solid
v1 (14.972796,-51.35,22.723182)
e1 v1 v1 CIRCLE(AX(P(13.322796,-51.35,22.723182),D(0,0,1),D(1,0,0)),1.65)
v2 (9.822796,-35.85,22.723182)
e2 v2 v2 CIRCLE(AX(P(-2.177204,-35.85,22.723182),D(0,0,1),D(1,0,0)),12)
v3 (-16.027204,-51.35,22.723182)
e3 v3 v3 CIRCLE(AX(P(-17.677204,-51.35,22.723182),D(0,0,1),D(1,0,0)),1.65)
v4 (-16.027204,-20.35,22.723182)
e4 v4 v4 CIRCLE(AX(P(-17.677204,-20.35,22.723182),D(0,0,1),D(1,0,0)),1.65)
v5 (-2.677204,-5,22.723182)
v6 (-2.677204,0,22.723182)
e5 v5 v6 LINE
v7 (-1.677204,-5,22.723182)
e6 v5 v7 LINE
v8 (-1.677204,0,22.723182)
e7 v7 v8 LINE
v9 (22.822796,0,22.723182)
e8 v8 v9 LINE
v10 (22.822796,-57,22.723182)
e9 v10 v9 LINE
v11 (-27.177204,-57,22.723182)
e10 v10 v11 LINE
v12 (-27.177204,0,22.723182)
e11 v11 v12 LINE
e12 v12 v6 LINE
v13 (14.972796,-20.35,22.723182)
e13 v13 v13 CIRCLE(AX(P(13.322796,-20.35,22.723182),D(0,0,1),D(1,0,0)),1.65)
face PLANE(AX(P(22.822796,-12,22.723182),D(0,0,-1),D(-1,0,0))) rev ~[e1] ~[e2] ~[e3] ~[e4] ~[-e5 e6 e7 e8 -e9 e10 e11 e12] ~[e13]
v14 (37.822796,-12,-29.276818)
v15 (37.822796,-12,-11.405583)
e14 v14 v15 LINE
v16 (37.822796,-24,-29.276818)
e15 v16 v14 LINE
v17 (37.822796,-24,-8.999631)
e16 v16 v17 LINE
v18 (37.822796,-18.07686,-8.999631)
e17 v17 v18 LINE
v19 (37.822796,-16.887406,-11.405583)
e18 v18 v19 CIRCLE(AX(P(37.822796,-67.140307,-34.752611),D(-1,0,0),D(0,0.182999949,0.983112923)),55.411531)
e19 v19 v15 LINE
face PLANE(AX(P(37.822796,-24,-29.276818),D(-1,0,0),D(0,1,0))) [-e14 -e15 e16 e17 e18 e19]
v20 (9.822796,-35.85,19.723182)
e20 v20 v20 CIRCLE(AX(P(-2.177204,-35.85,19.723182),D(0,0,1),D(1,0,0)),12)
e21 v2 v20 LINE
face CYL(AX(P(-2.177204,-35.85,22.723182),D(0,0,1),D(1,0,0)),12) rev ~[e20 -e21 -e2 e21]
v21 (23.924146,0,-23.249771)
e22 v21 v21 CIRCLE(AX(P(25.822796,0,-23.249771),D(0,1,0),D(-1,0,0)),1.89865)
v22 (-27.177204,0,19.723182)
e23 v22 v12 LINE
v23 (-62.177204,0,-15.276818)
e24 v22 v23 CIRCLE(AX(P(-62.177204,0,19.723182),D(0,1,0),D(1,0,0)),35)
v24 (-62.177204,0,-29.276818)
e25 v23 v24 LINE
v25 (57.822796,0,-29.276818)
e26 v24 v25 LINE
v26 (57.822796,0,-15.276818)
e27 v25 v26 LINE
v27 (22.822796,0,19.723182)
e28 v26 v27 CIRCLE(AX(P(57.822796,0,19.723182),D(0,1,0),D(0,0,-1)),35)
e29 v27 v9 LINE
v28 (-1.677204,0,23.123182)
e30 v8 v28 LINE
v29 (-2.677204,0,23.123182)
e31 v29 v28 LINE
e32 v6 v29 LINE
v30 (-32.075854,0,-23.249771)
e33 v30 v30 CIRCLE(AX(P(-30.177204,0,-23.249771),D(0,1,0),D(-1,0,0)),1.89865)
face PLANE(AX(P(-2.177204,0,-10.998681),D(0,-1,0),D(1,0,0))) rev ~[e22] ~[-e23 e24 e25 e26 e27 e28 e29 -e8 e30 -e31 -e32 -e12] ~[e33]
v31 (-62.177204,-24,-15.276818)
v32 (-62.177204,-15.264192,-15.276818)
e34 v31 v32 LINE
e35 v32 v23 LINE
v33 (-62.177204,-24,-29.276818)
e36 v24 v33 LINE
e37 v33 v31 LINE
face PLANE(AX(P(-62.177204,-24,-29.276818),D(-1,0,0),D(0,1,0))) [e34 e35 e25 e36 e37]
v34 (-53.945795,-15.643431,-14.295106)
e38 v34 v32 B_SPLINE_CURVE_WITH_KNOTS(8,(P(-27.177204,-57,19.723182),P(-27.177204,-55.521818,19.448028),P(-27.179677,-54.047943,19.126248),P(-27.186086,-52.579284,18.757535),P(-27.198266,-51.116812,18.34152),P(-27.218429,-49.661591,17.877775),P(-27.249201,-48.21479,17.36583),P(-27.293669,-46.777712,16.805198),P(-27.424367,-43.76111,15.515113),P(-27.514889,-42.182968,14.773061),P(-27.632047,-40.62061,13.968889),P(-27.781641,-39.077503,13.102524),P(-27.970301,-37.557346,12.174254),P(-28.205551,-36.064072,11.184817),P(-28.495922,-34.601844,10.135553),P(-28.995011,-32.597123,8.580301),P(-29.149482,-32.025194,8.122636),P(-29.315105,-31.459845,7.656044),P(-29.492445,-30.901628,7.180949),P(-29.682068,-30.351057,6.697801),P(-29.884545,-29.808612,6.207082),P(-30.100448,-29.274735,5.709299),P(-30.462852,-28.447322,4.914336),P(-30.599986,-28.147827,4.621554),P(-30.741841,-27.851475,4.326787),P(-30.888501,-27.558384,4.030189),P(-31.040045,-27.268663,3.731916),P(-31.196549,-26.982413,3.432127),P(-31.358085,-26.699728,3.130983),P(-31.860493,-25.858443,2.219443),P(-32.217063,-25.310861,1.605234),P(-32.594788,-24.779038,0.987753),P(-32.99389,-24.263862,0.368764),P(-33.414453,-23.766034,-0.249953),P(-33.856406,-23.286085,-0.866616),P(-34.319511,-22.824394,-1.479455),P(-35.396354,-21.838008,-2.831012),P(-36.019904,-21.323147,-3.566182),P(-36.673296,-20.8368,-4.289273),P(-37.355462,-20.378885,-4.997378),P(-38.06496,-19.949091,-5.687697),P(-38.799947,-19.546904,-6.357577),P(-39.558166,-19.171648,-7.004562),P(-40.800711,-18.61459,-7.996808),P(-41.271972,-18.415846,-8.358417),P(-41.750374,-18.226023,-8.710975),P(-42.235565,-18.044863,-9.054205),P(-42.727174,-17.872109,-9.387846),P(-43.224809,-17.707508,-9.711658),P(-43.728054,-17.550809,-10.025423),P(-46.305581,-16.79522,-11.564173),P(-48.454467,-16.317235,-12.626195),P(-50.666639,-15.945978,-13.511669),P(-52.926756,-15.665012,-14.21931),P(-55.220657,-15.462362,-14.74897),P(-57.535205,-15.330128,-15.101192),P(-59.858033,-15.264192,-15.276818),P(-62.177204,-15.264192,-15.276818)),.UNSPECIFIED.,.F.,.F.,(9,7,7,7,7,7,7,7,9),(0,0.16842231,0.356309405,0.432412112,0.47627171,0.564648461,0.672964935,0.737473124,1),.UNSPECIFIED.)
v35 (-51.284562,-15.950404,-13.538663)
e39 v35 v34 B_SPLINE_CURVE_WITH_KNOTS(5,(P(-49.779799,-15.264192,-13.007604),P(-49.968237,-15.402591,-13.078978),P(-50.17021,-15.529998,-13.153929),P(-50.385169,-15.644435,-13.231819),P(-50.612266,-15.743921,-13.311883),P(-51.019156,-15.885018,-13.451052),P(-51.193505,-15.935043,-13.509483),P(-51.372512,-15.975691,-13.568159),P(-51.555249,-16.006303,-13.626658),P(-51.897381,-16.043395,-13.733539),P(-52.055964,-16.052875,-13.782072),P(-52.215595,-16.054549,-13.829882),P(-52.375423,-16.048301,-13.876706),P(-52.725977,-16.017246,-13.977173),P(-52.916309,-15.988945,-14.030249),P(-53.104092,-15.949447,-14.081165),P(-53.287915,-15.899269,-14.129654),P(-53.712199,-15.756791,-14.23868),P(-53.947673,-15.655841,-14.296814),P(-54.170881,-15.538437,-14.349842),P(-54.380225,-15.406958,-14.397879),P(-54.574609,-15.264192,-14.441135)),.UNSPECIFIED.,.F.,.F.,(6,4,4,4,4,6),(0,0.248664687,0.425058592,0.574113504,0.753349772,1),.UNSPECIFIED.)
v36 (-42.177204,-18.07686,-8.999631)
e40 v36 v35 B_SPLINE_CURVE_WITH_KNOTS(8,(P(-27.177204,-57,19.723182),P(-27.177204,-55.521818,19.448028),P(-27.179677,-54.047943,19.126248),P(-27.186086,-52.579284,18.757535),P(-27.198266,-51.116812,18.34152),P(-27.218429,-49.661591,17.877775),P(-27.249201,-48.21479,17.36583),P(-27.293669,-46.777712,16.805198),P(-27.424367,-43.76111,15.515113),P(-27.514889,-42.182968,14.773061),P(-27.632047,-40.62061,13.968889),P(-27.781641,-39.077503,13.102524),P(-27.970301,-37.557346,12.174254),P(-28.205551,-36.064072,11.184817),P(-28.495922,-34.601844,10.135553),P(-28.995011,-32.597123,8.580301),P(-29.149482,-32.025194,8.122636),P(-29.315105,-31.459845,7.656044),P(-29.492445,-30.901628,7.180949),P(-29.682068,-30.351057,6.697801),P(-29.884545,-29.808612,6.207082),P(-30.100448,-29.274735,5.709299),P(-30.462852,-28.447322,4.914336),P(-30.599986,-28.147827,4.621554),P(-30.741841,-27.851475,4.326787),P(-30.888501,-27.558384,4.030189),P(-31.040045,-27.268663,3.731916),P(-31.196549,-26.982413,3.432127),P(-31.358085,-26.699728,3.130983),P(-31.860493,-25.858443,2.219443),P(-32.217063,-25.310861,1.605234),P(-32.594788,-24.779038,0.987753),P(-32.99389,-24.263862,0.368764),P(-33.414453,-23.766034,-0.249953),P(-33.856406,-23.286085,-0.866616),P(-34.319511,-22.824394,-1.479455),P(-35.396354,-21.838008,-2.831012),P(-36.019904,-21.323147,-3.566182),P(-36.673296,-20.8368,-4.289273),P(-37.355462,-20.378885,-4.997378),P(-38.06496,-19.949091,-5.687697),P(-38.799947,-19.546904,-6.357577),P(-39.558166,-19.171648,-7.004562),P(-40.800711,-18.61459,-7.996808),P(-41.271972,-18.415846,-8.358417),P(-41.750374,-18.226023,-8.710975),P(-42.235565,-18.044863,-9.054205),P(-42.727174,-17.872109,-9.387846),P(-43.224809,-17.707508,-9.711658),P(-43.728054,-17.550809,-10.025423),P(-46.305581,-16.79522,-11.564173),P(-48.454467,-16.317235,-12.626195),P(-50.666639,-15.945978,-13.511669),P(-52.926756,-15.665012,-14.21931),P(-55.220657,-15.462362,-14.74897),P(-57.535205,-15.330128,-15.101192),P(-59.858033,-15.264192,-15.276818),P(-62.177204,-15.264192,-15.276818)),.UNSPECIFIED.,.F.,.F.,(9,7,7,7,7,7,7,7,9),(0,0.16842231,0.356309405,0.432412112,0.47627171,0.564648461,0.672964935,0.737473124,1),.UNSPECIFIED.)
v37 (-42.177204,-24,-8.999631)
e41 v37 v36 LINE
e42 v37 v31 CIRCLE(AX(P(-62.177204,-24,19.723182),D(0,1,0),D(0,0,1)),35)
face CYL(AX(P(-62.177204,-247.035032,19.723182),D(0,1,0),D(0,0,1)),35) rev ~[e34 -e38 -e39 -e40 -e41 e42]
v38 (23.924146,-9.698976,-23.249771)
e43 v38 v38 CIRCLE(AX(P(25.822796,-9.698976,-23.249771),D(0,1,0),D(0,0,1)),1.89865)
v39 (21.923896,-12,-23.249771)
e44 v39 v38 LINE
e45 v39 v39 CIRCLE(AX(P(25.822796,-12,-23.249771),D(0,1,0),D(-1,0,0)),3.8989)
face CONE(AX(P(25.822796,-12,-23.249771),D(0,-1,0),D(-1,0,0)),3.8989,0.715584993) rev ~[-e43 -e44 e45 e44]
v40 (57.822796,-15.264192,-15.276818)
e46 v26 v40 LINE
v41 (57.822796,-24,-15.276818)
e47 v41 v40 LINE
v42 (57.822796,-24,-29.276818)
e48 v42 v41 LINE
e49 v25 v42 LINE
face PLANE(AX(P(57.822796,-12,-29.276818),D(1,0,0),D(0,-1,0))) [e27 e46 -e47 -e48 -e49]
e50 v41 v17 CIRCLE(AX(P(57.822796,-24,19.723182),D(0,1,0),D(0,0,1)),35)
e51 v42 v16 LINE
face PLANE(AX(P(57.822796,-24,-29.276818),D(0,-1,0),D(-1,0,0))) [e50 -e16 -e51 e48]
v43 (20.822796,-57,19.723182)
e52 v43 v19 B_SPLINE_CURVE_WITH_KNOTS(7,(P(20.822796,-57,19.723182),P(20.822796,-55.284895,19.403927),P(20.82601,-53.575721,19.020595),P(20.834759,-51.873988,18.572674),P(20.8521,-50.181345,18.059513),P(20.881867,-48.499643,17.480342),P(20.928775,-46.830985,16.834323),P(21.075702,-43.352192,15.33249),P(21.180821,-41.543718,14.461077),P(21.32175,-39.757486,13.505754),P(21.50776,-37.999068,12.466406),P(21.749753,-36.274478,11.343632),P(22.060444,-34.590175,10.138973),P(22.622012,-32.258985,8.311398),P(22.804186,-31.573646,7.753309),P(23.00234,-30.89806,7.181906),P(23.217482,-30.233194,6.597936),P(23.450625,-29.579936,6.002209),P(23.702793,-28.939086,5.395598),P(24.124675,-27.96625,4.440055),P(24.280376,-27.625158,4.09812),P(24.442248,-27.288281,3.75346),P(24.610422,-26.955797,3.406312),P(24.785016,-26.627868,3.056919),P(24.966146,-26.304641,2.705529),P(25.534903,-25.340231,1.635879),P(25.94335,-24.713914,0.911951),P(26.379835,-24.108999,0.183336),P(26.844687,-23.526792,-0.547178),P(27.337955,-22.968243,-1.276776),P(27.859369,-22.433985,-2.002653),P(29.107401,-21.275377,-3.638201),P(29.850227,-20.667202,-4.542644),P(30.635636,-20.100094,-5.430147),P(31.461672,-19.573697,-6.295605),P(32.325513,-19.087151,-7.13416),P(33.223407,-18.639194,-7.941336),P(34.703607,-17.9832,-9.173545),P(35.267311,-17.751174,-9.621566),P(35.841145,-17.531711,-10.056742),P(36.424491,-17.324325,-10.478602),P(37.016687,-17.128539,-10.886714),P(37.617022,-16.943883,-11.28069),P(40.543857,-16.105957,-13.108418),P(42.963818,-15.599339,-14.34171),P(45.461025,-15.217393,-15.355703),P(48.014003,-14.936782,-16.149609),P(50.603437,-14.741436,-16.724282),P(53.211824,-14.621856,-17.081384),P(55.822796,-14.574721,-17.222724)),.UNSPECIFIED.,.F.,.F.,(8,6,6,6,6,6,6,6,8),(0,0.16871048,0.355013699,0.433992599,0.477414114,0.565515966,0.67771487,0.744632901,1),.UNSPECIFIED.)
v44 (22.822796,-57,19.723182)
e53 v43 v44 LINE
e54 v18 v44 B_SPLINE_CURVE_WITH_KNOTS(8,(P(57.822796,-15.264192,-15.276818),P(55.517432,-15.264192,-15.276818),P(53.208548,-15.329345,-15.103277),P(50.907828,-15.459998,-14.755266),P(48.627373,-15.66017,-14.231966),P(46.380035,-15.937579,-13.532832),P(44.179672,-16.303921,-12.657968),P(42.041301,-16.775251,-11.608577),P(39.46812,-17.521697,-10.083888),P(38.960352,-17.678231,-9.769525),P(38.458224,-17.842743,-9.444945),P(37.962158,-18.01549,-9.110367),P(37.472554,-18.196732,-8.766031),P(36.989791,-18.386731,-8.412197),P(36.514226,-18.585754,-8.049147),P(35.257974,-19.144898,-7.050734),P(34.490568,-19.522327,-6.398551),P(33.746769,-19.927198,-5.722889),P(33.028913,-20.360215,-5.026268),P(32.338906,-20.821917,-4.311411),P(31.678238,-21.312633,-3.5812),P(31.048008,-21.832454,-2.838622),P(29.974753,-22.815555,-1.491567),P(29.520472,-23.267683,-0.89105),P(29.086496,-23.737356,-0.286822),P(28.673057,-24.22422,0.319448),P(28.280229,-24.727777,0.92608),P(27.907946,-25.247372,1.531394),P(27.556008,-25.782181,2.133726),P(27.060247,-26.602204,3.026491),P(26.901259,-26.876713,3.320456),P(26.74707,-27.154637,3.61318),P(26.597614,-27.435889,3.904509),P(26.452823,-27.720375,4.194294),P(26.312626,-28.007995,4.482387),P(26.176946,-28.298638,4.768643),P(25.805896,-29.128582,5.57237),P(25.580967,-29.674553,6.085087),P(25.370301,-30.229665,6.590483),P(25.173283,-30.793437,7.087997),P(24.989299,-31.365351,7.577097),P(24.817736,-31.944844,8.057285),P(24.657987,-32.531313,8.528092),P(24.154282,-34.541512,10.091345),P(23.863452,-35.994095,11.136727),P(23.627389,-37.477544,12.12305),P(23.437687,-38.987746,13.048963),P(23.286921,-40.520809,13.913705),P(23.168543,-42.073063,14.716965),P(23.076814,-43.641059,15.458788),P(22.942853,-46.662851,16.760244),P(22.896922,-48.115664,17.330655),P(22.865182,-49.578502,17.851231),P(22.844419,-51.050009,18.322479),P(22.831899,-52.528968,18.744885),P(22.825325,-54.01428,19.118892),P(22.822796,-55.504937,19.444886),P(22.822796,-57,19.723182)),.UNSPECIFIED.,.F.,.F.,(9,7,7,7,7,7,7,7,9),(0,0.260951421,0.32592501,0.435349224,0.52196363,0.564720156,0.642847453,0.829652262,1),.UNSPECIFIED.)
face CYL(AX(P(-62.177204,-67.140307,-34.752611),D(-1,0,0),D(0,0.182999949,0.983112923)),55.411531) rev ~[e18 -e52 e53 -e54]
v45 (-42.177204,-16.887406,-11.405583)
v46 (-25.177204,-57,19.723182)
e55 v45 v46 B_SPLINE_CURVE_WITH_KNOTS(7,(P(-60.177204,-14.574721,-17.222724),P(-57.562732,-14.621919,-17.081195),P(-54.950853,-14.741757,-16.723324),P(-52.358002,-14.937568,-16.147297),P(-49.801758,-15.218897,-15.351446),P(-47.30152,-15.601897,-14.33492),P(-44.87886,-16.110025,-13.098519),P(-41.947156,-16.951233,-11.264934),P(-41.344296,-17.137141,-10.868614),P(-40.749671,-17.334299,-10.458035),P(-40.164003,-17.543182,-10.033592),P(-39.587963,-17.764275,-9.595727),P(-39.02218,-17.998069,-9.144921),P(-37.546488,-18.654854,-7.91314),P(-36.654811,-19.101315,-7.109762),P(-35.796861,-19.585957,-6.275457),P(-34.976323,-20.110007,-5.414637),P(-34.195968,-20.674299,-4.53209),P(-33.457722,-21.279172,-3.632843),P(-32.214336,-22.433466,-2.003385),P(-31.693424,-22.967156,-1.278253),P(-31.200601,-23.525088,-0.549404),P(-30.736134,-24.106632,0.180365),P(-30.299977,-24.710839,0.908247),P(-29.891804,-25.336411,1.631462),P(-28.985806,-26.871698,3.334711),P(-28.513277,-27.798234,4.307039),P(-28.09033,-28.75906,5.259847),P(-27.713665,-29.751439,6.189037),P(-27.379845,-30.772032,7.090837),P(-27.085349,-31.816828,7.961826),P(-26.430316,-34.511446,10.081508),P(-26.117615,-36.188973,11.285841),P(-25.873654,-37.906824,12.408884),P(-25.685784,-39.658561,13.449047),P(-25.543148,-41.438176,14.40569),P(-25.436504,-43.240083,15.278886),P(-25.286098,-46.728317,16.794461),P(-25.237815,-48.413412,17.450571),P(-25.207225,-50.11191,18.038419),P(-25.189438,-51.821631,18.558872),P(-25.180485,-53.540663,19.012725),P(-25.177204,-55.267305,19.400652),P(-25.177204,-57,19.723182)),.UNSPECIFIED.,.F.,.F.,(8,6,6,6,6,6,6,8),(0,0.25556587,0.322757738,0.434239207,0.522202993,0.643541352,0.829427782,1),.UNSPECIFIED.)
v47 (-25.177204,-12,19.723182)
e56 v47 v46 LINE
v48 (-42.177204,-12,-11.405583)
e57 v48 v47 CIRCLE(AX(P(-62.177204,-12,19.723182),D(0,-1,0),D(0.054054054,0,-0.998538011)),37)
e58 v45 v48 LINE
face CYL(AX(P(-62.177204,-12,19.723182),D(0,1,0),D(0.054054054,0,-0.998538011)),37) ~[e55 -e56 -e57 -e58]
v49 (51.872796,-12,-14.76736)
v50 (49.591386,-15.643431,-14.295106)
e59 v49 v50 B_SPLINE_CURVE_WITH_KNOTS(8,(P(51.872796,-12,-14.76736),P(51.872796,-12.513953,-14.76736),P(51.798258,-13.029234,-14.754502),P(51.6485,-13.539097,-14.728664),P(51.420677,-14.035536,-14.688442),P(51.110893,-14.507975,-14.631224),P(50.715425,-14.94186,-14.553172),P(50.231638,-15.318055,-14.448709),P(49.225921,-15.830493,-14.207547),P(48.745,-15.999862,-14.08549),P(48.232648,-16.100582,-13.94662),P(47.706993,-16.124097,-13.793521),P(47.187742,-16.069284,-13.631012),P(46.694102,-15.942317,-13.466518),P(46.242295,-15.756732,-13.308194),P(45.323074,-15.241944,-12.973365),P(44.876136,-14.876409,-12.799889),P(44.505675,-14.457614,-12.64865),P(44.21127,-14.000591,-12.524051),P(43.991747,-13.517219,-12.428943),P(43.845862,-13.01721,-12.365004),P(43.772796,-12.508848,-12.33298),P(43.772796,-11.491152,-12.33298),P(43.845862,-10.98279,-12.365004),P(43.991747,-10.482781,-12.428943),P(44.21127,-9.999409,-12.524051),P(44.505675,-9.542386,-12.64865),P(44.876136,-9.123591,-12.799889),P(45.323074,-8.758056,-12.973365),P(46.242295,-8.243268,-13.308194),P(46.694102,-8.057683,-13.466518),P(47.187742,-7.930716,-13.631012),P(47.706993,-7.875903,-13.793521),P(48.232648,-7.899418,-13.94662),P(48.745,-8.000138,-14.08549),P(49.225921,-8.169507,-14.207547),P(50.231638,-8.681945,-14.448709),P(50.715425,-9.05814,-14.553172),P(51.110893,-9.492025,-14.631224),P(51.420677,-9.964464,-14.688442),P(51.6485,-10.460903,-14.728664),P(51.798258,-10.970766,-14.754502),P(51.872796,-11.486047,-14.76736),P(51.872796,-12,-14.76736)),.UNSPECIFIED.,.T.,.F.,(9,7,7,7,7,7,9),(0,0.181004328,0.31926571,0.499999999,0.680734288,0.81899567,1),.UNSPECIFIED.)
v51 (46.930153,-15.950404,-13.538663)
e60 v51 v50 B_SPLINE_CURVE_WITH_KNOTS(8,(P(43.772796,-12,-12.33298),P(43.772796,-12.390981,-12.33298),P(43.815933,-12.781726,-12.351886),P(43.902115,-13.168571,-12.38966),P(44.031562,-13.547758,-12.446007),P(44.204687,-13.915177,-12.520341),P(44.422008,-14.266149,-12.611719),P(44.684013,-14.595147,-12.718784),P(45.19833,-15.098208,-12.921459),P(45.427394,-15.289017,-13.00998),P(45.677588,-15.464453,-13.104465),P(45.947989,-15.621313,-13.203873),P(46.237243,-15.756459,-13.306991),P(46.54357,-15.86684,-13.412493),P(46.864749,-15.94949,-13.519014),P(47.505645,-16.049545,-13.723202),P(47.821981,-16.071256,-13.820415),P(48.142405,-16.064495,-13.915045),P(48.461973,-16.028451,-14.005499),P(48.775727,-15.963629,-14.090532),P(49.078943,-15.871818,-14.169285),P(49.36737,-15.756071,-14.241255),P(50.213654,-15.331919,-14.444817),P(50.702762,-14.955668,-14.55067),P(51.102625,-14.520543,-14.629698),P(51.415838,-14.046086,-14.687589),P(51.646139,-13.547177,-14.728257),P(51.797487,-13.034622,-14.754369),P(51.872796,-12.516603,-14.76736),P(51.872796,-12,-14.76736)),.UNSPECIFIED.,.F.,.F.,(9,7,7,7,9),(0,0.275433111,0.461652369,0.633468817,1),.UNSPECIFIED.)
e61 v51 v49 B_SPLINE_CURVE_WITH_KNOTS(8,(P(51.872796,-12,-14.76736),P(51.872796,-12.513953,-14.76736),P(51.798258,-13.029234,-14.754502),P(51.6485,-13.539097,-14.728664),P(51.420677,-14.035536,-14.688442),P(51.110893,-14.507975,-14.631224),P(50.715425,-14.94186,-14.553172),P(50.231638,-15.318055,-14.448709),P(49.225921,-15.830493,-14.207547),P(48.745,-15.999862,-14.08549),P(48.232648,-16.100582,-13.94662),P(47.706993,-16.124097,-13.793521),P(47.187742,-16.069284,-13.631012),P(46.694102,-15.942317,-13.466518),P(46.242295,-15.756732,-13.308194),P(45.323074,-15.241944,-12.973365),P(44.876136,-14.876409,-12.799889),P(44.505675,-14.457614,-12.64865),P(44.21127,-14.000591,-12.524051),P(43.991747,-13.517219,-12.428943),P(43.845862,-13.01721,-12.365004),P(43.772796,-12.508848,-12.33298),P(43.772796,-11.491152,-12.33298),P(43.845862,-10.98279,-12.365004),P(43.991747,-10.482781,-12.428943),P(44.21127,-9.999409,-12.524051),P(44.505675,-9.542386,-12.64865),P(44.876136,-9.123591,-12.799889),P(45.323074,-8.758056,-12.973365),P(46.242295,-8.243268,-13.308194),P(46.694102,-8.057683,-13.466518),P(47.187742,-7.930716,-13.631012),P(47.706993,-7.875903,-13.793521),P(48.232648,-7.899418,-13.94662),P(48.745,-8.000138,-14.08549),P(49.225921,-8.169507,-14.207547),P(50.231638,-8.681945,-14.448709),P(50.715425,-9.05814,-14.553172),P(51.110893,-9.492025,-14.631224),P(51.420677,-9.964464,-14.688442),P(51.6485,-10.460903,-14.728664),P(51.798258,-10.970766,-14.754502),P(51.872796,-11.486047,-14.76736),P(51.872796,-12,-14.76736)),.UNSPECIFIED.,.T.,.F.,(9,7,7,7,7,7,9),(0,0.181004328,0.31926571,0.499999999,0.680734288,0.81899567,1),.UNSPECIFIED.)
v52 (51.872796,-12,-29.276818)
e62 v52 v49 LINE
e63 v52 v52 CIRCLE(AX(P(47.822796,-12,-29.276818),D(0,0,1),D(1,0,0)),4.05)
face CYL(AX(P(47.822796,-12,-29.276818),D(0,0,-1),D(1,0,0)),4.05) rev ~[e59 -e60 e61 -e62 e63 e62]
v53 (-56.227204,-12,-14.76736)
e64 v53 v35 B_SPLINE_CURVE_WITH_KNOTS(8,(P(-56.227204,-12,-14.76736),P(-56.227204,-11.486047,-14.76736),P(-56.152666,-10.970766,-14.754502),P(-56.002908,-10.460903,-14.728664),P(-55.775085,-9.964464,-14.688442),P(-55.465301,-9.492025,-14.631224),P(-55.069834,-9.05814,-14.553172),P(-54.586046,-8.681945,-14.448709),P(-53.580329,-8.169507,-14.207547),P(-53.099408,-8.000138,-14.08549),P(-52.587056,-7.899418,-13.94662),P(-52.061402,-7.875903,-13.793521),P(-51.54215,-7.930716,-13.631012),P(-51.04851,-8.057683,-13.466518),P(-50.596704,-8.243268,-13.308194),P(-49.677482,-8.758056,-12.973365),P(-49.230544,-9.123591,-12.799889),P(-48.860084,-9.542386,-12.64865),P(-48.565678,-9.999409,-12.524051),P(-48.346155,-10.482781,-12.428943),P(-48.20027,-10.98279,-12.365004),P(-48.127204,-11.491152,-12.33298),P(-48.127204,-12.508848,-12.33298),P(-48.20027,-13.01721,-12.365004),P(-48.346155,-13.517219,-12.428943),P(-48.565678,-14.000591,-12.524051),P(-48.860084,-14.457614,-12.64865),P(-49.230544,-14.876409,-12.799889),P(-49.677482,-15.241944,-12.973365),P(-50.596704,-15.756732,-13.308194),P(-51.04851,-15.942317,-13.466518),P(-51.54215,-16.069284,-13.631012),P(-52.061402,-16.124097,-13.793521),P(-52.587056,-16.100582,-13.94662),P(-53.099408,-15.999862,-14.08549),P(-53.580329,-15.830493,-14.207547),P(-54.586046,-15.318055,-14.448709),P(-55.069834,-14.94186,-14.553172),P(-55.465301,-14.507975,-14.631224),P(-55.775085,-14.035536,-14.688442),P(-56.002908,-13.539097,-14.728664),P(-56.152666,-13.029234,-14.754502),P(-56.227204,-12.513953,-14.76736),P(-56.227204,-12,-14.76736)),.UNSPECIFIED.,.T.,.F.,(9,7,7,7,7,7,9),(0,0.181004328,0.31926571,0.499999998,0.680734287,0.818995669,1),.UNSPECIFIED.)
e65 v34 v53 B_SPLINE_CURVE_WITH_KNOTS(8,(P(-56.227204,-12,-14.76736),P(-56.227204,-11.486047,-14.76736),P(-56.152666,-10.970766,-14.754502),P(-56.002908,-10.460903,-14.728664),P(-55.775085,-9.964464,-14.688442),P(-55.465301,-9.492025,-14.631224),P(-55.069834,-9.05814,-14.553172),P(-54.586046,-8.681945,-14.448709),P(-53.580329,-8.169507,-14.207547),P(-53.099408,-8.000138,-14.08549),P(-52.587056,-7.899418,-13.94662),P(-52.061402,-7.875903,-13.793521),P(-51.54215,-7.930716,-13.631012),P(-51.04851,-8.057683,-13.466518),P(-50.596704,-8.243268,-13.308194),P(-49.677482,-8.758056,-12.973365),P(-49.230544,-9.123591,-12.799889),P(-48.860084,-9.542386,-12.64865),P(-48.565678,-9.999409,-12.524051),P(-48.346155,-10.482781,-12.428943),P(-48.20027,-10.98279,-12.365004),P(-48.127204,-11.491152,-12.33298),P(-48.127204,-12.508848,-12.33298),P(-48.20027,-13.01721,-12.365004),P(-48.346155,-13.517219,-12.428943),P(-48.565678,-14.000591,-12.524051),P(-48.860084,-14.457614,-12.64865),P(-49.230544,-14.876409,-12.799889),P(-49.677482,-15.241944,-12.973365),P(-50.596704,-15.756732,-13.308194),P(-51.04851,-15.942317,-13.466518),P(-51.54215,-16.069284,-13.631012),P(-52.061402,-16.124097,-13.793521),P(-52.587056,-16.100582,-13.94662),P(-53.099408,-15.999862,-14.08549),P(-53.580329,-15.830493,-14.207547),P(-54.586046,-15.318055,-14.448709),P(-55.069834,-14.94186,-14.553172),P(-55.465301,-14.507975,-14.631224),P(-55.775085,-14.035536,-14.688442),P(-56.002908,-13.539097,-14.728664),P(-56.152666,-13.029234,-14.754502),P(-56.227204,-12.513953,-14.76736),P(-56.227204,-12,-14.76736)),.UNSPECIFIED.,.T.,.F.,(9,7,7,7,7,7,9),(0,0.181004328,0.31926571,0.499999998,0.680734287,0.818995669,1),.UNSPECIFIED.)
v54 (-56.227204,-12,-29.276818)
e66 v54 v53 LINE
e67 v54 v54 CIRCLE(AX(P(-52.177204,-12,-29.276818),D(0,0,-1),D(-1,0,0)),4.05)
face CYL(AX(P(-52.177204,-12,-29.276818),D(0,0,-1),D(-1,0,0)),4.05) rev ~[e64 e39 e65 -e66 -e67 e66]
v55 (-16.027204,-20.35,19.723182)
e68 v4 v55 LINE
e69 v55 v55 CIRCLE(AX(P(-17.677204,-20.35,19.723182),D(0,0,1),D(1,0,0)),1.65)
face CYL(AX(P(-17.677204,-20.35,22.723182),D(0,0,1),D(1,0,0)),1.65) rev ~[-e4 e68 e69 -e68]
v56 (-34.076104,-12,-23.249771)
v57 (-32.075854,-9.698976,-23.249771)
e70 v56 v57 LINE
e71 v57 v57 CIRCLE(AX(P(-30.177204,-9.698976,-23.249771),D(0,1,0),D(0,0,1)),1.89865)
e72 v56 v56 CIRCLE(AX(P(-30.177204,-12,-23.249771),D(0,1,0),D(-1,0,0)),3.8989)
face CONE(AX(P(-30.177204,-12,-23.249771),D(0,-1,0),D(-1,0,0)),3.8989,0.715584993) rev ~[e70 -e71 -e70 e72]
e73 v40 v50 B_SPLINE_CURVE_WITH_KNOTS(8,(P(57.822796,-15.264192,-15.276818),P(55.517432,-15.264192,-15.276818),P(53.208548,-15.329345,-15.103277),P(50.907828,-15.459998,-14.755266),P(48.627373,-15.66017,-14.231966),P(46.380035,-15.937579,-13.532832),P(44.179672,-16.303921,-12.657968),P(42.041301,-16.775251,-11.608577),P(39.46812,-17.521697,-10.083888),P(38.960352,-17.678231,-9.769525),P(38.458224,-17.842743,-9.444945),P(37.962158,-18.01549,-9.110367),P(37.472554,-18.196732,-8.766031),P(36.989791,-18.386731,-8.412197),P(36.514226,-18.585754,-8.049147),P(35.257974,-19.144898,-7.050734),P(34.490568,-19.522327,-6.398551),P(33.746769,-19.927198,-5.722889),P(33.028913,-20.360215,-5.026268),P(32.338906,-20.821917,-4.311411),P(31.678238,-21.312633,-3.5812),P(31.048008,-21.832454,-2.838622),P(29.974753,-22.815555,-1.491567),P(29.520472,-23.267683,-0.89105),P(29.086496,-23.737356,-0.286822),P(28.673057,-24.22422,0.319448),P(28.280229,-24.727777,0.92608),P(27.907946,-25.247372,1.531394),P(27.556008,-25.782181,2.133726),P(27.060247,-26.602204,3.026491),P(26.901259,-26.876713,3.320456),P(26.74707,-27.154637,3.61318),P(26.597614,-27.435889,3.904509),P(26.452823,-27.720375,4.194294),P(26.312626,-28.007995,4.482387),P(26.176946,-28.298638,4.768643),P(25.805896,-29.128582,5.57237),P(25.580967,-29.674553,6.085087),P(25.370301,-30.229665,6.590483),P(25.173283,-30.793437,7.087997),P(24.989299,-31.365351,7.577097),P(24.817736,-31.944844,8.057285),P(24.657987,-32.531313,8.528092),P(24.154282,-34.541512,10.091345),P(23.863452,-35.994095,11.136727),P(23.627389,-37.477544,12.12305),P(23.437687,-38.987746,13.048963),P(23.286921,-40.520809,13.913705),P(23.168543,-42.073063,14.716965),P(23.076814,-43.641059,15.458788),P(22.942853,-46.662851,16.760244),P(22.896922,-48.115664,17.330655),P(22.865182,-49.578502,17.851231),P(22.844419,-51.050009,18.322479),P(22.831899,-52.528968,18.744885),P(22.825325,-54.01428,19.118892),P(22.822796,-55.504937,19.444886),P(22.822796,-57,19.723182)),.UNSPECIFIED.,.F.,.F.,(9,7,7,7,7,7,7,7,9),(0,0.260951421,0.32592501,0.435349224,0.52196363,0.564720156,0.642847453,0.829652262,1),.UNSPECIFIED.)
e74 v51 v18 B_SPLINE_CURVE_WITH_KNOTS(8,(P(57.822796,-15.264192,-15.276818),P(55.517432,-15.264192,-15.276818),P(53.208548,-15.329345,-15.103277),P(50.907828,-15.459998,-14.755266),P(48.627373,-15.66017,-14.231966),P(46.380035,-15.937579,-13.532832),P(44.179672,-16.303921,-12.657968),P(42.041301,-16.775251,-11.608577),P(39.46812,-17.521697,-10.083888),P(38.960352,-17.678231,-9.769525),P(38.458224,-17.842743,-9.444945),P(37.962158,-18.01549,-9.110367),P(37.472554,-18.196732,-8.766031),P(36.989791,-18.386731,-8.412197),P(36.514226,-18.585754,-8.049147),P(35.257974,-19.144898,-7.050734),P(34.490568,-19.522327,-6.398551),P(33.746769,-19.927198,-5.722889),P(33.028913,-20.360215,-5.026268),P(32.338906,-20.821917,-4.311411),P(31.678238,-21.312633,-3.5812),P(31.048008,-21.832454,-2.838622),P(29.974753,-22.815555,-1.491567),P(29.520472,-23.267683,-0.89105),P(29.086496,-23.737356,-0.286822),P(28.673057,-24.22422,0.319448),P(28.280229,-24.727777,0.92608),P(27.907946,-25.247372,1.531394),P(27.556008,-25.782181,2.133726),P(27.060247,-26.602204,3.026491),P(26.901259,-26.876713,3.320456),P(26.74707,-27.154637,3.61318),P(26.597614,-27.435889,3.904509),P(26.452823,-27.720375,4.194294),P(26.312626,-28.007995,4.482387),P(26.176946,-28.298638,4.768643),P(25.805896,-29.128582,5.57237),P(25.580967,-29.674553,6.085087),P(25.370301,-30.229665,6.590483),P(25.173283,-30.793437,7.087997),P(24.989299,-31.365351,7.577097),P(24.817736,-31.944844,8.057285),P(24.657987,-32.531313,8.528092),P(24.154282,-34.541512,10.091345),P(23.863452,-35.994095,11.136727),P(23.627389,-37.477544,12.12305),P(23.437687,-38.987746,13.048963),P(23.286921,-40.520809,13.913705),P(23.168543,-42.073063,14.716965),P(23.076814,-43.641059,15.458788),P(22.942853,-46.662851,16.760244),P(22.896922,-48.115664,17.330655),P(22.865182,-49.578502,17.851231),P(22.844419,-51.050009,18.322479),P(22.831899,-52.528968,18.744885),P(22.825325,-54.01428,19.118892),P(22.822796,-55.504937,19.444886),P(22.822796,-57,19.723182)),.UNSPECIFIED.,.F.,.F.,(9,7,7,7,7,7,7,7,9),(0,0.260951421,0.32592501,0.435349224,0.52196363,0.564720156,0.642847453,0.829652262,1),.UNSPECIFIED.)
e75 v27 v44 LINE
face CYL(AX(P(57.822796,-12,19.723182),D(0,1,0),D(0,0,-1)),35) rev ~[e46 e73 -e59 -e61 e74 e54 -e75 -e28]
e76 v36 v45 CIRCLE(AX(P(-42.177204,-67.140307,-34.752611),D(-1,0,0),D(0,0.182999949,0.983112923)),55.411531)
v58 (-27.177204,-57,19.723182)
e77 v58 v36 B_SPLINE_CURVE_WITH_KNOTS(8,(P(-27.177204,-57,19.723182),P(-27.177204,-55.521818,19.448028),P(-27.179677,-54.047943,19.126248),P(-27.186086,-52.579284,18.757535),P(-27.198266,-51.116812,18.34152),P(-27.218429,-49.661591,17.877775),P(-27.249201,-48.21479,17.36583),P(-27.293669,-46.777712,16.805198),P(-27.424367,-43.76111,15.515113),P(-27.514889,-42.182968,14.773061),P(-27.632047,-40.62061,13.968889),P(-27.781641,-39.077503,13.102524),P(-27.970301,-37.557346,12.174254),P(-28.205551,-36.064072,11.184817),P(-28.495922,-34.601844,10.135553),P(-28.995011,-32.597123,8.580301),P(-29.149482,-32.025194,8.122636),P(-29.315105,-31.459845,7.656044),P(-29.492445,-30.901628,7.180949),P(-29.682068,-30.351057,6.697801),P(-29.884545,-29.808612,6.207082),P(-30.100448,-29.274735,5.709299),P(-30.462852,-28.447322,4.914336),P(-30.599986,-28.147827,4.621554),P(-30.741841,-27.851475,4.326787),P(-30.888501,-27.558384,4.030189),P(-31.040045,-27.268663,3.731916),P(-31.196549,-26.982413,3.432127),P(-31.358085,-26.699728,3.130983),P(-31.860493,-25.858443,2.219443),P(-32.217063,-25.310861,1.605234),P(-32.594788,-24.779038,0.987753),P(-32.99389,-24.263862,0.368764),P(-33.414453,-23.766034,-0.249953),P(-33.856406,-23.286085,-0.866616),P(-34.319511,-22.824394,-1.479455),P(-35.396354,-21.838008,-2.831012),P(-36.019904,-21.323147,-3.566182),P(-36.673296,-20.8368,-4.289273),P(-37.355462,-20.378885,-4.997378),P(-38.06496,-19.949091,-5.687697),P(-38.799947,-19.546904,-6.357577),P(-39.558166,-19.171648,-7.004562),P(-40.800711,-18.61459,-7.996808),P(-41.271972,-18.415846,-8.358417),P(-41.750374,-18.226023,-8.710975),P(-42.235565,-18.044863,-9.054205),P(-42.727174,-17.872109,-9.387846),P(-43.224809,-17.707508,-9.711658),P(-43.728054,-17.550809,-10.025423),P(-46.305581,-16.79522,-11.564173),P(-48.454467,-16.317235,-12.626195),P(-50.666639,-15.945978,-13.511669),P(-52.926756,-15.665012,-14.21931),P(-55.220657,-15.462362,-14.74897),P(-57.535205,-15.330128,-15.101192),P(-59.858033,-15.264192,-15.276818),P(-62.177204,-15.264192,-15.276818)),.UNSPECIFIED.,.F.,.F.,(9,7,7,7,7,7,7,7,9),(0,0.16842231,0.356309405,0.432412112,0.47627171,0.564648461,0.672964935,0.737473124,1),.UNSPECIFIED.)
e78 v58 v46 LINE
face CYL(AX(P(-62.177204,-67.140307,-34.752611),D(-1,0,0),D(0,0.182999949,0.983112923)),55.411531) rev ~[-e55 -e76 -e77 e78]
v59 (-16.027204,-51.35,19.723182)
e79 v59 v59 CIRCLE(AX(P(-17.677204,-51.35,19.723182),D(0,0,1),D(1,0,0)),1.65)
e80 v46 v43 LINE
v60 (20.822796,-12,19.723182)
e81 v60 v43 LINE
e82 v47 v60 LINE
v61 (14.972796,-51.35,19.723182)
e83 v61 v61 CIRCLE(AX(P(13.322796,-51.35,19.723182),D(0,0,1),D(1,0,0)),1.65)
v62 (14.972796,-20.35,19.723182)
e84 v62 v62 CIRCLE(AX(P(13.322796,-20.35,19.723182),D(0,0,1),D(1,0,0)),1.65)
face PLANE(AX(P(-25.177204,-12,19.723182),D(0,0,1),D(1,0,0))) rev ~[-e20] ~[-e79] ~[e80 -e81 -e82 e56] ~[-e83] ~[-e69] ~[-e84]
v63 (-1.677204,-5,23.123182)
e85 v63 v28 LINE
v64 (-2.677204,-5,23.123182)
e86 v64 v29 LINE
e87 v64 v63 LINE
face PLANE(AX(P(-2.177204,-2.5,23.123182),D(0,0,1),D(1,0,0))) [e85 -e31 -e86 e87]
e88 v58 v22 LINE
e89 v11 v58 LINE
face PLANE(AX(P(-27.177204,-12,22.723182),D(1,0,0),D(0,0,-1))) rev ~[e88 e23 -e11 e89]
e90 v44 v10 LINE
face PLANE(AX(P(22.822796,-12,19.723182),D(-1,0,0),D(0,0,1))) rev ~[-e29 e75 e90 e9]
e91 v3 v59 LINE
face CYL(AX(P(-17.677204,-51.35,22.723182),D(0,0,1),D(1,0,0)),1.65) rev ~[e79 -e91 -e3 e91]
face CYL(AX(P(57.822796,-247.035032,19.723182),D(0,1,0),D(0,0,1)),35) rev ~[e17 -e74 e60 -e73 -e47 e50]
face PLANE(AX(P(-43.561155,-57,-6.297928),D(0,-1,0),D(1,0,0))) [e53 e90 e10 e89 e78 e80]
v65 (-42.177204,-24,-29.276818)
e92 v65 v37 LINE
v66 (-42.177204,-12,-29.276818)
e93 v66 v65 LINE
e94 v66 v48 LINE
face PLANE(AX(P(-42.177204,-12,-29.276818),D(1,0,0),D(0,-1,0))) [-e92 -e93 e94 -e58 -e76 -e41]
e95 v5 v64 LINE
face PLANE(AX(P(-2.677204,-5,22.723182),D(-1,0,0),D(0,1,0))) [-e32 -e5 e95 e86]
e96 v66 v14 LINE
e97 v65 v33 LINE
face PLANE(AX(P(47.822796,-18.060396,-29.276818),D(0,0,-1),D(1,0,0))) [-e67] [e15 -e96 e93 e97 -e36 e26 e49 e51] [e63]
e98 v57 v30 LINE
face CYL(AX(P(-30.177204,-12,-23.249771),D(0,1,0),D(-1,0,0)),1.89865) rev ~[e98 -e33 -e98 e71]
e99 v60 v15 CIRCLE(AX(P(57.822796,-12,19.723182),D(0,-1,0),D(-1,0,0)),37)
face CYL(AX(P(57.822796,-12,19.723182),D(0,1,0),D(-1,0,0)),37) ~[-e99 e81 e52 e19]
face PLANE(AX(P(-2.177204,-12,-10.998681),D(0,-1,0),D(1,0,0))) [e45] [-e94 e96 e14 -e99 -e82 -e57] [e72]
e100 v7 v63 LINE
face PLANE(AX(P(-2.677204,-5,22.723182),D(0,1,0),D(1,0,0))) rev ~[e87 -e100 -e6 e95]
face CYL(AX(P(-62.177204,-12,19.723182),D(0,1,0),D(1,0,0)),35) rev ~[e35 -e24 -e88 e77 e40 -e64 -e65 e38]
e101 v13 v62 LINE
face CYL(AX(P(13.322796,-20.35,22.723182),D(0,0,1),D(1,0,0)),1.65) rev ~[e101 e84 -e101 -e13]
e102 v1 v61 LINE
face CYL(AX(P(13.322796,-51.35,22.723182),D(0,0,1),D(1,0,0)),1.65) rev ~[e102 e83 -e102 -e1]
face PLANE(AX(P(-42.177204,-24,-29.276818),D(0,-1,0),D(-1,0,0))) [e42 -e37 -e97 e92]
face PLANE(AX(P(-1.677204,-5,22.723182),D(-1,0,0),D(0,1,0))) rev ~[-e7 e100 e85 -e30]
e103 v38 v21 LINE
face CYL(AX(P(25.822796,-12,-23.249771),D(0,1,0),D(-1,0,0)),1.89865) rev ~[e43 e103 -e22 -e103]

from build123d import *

# Parameters (mm, degrees)
F0_W           = 50
F0_H           = 3
F1_DEPTH       = 12
F3_DEPTH       = 45
F5_DEPTH       = 120.001
F6_R           = 12
F6_R_2         = 1.65
F7_DEPTH       = 25
F9_D           = 3.7973
F9_CSINK_D     = 7.7978
F9_CSINK_ANGLE = 82
F10_W          = 1
F10_H          = 5
F11_DEPTH      = 0.4
F13_END_RADIUS = 35
F13_REACH      = 75.7248075794
F14_END_RADIUS = 35
F14_REACH      = 75.7248075794
F15_DEPTH      = 25


with BuildPart() as f1:
    # F0 (on Front) → F1 (new body)
    with BuildSketch(Plane.XZ):
        with BuildLine():
            Line((22.8227958083, 19.723181963), (-27.1772041917, 19.723181963))
            ThreePointArc((-27.1772041917, 19.723181963), (-37.4284668502, -5.0255553786), (-62.1772041917, -15.276818037))
            Line((-62.1772041917, -15.276818037), (-62.1772041917, -29.276818037))
            Line((-62.1772041917, -29.276818037), (57.8227958083, -29.276818037))
            Line((57.8227958083, -29.276818037), (57.8227958083, -15.276818037))
            ThreePointArc((57.8227958083, -15.276818037), (33.0740584668, -5.0255553786), (22.8227958083, 19.723181963))
        make_face()
        with Locations((-2.1772041917, 21.223181963)):
            Rectangle(F0_W, F0_H)
    extrude(amount=F1_DEPTH)

    # F2 (on face) → F3 (join)
    with BuildSketch(Plane.XZ.offset(12)):
        with BuildLine():
            Line((-25.1772041917, 19.723181963), (-27.1772041917, 19.723181963))
            ThreePointArc((-27.1772041917, 19.723181963), (-37.4284668502, -5.0255553786), (-62.1772041917, -15.276818037))
            Line((-62.1772041917, -15.276818037), (-62.1772041917, -29.276818037))
            Line((-62.1772041917, -29.276818037), (-60.1772041917, -29.276818037))
            Line((-60.1772041917, -29.276818037), (-60.1772041917, -17.2227244409))
            ThreePointArc((-60.1772041917, -17.2227244409), (-35.3164521546, -5.722839337), (-25.1772041917, 19.723181963))
        make_face()
        Polygon((-27.1772041917, 22.723181963), (-27.1772041917, 19.723181963), (-25.1772041917, 19.723181963), (20.8227958083, 19.723181963), (22.8227958083, 19.723181963), (22.8227958083, 22.723181963), align=None)
        with BuildLine():
            Line((22.8227958083, 19.723181963), (20.8227958083, 19.723181963))
            ThreePointArc((20.8227958083, 19.723181963), (30.9620437712, -5.722839337), (55.8227958083, -17.2227244409))
            Line((55.8227958083, -17.2227244409), (55.8227958083, -29.276818037))
            Line((55.8227958083, -29.276818037), (57.8227958083, -29.276818037))
            Line((57.8227958083, -29.276818037), (57.8227958083, -15.276818037))
            ThreePointArc((57.8227958083, -15.276818037), (33.0740584668, -5.0255553786), (22.8227958083, 19.723181963))
        make_face()
    extrude(amount=F3_DEPTH)

    # F4 (on face) → F5 (cut, through all)
    with BuildSketch(Plane(origin=(-62.1772041917, 0, 0), x_dir=(0, -1, 0), z_dir=(-1, 0, 0))):
        with BuildLine():
            Line((57, -15.276818037), (57, 19.723181963))
            ThreePointArc((57, 19.723181963), (26.3280584166, 2.7280262742), (12, -29.276818037))
            Line((12, -29.276818037), (57, -29.276818037))
            Line((57, -29.276818037), (57, -15.276818037))
        make_face()
    extrude(amount=-F5_DEPTH, mode=Mode.SUBTRACT)

    # F6 (on face) → F7 (cut)
    with BuildSketch(Plane.XY.offset(22.723181963)):
        with Locations((-2.1772041917, -35.85)):
            Circle(F6_R)
        with Locations((-17.6772041917, -51.35)):
            Circle(F6_R_2)
        with Locations((-17.6772041917, -20.35)):
            Circle(F6_R_2)
        with Locations((13.3227958083, -51.35)):
            Circle(F6_R_2)
        with Locations((13.3227958083, -20.35)):
            Circle(F6_R_2)
    extrude(amount=-F7_DEPTH, mode=Mode.SUBTRACT)

    # F9 (through all)
    with Locations(Plane.XZ.offset(12)):
        with Locations((-30.1772041917, -23.2497712389), (25.8227958083, -23.2497712389)):
            CounterSinkHole(F9_D / 2, F9_CSINK_D / 2, counter_sink_angle=F9_CSINK_ANGLE)

    # F10 (on face) → F11 (join)
    with BuildSketch(Plane.XY.offset(22.723181963)):
        with Locations((-2.1772041917, -2.5)):
            Rectangle(F10_W, F10_H)
    extrude(amount=F11_DEPTH)

    f13_end = (Plane(origin=(-62.1772041917, -28.5, 19.723181963), x_dir=(0, 0, 1), z_dir=(0, 1, 0)) * Cylinder(F13_END_RADIUS, 437.0700631752, mode=Mode.PRIVATE)).faces().sort_by_distance((-37.4284668502, -0.7549172174, -5.0255553786))[0]
    # F12 (on face) → F13 (join, up to the whole of a round face its end follows)
    with BuildSketch(Plane(origin=(0, 0, -29.276818037), x_dir=(1, 0, 0), z_dir=(0, 0, -1))):
        with BuildLine():
            Line((-62.1772041917, 24), (-62.1772041917, 12))
            Line((-62.1772041917, 12), (-60.1772041917, 12))
            Line((-60.1772041917, 12), (-56.2272041917, 12))
            ThreePointArc((-56.2272041917, 12), (-52.1772041917, 16.05), (-48.1272041917, 12))
            Line((-48.1272041917, 12), (-42.1772041917, 12))
            Line((-42.1772041917, 12), (-42.1772041917, 24))
            Line((-42.1772041917, 24), (-62.1772041917, 24))
        make_face()
        with BuildLine():
            Line((-56.2272041917, 12), (-48.1272041917, 12))
            ThreePointArc((-48.1272041917, 12), (-52.1772041917, 16.05), (-56.2272041917, 12))
        make_face()
    f13_long = extrude(amount=-F13_REACH, mode=Mode.PRIVATE)
    add(split(f13_long, bisect_by=f13_end, keep=Keep.TOP, mode=Mode.PRIVATE))

    f14_end = (Plane(origin=(57.8227958083, -28.5, 19.723181963), x_dir=(0, 0, 1), z_dir=(0, 1, 0)) * Cylinder(F14_END_RADIUS, 437.0700631752, mode=Mode.PRIVATE)).faces().sort_by_distance((33.0740584668, -0.7549172174, -5.0255553786))[0]
    # F12 (on face) → F14 (join, up to the whole of a round face its end follows)
    with BuildSketch(Plane(origin=(0, 0, -29.276818037), x_dir=(1, 0, 0), z_dir=(0, 0, -1))):
        with BuildLine():
            Line((37.8227958083, 24), (37.8227958083, 12))
            Line((37.8227958083, 12), (43.7727958083, 12))
            ThreePointArc((43.7727958083, 12), (47.8227958083, 16.05), (51.8727958083, 12))
            Line((51.8727958083, 12), (55.8227958083, 12))
            Line((55.8227958083, 12), (57.8227958083, 12))
            Line((57.8227958083, 12), (57.8227958083, 24))
            Line((57.8227958083, 24), (37.8227958083, 24))
        make_face()
        with BuildLine():
            Line((51.8727958083, 12), (43.7727958083, 12))
            ThreePointArc((43.7727958083, 12), (47.8227958083, 7.95), (51.8727958083, 12))
        make_face()
    f14_long = extrude(amount=-F14_REACH, mode=Mode.PRIVATE)
    add(split(f14_long, bisect_by=f14_end, keep=Keep.TOP, mode=Mode.PRIVATE))

    # F12 (on face) → F15 (cut)
    with BuildSketch(Plane(origin=(0, 0, -29.276818037), x_dir=(1, 0, 0), z_dir=(0, 0, -1))):
        with BuildLine():
            Line((-56.2272041917, 12), (-48.1272041917, 12))
            ThreePointArc((-48.1272041917, 12), (-52.1772041917, 16.05), (-56.2272041917, 12))
        make_face()
        with BuildLine():
            ThreePointArc((-56.2272041917, 12), (-52.1772041917, 7.95), (-48.1272041917, 12))
            Line((-48.1272041917, 12), (-56.2272041917, 12))
        make_face()
        with BuildLine():
            Line((51.8727958083, 12), (43.7727958083, 12))
            ThreePointArc((43.7727958083, 12), (47.8227958083, 7.95), (51.8727958083, 12))
        make_face()
        with BuildLine():
            ThreePointArc((51.8727958083, 12), (47.8227958083, 16.05), (43.7727958083, 12))
            Line((43.7727958083, 12), (51.8727958083, 12))
        make_face()
    extrude(amount=-F15_DEPTH, mode=Mode.SUBTRACT)


solid = f1.part
